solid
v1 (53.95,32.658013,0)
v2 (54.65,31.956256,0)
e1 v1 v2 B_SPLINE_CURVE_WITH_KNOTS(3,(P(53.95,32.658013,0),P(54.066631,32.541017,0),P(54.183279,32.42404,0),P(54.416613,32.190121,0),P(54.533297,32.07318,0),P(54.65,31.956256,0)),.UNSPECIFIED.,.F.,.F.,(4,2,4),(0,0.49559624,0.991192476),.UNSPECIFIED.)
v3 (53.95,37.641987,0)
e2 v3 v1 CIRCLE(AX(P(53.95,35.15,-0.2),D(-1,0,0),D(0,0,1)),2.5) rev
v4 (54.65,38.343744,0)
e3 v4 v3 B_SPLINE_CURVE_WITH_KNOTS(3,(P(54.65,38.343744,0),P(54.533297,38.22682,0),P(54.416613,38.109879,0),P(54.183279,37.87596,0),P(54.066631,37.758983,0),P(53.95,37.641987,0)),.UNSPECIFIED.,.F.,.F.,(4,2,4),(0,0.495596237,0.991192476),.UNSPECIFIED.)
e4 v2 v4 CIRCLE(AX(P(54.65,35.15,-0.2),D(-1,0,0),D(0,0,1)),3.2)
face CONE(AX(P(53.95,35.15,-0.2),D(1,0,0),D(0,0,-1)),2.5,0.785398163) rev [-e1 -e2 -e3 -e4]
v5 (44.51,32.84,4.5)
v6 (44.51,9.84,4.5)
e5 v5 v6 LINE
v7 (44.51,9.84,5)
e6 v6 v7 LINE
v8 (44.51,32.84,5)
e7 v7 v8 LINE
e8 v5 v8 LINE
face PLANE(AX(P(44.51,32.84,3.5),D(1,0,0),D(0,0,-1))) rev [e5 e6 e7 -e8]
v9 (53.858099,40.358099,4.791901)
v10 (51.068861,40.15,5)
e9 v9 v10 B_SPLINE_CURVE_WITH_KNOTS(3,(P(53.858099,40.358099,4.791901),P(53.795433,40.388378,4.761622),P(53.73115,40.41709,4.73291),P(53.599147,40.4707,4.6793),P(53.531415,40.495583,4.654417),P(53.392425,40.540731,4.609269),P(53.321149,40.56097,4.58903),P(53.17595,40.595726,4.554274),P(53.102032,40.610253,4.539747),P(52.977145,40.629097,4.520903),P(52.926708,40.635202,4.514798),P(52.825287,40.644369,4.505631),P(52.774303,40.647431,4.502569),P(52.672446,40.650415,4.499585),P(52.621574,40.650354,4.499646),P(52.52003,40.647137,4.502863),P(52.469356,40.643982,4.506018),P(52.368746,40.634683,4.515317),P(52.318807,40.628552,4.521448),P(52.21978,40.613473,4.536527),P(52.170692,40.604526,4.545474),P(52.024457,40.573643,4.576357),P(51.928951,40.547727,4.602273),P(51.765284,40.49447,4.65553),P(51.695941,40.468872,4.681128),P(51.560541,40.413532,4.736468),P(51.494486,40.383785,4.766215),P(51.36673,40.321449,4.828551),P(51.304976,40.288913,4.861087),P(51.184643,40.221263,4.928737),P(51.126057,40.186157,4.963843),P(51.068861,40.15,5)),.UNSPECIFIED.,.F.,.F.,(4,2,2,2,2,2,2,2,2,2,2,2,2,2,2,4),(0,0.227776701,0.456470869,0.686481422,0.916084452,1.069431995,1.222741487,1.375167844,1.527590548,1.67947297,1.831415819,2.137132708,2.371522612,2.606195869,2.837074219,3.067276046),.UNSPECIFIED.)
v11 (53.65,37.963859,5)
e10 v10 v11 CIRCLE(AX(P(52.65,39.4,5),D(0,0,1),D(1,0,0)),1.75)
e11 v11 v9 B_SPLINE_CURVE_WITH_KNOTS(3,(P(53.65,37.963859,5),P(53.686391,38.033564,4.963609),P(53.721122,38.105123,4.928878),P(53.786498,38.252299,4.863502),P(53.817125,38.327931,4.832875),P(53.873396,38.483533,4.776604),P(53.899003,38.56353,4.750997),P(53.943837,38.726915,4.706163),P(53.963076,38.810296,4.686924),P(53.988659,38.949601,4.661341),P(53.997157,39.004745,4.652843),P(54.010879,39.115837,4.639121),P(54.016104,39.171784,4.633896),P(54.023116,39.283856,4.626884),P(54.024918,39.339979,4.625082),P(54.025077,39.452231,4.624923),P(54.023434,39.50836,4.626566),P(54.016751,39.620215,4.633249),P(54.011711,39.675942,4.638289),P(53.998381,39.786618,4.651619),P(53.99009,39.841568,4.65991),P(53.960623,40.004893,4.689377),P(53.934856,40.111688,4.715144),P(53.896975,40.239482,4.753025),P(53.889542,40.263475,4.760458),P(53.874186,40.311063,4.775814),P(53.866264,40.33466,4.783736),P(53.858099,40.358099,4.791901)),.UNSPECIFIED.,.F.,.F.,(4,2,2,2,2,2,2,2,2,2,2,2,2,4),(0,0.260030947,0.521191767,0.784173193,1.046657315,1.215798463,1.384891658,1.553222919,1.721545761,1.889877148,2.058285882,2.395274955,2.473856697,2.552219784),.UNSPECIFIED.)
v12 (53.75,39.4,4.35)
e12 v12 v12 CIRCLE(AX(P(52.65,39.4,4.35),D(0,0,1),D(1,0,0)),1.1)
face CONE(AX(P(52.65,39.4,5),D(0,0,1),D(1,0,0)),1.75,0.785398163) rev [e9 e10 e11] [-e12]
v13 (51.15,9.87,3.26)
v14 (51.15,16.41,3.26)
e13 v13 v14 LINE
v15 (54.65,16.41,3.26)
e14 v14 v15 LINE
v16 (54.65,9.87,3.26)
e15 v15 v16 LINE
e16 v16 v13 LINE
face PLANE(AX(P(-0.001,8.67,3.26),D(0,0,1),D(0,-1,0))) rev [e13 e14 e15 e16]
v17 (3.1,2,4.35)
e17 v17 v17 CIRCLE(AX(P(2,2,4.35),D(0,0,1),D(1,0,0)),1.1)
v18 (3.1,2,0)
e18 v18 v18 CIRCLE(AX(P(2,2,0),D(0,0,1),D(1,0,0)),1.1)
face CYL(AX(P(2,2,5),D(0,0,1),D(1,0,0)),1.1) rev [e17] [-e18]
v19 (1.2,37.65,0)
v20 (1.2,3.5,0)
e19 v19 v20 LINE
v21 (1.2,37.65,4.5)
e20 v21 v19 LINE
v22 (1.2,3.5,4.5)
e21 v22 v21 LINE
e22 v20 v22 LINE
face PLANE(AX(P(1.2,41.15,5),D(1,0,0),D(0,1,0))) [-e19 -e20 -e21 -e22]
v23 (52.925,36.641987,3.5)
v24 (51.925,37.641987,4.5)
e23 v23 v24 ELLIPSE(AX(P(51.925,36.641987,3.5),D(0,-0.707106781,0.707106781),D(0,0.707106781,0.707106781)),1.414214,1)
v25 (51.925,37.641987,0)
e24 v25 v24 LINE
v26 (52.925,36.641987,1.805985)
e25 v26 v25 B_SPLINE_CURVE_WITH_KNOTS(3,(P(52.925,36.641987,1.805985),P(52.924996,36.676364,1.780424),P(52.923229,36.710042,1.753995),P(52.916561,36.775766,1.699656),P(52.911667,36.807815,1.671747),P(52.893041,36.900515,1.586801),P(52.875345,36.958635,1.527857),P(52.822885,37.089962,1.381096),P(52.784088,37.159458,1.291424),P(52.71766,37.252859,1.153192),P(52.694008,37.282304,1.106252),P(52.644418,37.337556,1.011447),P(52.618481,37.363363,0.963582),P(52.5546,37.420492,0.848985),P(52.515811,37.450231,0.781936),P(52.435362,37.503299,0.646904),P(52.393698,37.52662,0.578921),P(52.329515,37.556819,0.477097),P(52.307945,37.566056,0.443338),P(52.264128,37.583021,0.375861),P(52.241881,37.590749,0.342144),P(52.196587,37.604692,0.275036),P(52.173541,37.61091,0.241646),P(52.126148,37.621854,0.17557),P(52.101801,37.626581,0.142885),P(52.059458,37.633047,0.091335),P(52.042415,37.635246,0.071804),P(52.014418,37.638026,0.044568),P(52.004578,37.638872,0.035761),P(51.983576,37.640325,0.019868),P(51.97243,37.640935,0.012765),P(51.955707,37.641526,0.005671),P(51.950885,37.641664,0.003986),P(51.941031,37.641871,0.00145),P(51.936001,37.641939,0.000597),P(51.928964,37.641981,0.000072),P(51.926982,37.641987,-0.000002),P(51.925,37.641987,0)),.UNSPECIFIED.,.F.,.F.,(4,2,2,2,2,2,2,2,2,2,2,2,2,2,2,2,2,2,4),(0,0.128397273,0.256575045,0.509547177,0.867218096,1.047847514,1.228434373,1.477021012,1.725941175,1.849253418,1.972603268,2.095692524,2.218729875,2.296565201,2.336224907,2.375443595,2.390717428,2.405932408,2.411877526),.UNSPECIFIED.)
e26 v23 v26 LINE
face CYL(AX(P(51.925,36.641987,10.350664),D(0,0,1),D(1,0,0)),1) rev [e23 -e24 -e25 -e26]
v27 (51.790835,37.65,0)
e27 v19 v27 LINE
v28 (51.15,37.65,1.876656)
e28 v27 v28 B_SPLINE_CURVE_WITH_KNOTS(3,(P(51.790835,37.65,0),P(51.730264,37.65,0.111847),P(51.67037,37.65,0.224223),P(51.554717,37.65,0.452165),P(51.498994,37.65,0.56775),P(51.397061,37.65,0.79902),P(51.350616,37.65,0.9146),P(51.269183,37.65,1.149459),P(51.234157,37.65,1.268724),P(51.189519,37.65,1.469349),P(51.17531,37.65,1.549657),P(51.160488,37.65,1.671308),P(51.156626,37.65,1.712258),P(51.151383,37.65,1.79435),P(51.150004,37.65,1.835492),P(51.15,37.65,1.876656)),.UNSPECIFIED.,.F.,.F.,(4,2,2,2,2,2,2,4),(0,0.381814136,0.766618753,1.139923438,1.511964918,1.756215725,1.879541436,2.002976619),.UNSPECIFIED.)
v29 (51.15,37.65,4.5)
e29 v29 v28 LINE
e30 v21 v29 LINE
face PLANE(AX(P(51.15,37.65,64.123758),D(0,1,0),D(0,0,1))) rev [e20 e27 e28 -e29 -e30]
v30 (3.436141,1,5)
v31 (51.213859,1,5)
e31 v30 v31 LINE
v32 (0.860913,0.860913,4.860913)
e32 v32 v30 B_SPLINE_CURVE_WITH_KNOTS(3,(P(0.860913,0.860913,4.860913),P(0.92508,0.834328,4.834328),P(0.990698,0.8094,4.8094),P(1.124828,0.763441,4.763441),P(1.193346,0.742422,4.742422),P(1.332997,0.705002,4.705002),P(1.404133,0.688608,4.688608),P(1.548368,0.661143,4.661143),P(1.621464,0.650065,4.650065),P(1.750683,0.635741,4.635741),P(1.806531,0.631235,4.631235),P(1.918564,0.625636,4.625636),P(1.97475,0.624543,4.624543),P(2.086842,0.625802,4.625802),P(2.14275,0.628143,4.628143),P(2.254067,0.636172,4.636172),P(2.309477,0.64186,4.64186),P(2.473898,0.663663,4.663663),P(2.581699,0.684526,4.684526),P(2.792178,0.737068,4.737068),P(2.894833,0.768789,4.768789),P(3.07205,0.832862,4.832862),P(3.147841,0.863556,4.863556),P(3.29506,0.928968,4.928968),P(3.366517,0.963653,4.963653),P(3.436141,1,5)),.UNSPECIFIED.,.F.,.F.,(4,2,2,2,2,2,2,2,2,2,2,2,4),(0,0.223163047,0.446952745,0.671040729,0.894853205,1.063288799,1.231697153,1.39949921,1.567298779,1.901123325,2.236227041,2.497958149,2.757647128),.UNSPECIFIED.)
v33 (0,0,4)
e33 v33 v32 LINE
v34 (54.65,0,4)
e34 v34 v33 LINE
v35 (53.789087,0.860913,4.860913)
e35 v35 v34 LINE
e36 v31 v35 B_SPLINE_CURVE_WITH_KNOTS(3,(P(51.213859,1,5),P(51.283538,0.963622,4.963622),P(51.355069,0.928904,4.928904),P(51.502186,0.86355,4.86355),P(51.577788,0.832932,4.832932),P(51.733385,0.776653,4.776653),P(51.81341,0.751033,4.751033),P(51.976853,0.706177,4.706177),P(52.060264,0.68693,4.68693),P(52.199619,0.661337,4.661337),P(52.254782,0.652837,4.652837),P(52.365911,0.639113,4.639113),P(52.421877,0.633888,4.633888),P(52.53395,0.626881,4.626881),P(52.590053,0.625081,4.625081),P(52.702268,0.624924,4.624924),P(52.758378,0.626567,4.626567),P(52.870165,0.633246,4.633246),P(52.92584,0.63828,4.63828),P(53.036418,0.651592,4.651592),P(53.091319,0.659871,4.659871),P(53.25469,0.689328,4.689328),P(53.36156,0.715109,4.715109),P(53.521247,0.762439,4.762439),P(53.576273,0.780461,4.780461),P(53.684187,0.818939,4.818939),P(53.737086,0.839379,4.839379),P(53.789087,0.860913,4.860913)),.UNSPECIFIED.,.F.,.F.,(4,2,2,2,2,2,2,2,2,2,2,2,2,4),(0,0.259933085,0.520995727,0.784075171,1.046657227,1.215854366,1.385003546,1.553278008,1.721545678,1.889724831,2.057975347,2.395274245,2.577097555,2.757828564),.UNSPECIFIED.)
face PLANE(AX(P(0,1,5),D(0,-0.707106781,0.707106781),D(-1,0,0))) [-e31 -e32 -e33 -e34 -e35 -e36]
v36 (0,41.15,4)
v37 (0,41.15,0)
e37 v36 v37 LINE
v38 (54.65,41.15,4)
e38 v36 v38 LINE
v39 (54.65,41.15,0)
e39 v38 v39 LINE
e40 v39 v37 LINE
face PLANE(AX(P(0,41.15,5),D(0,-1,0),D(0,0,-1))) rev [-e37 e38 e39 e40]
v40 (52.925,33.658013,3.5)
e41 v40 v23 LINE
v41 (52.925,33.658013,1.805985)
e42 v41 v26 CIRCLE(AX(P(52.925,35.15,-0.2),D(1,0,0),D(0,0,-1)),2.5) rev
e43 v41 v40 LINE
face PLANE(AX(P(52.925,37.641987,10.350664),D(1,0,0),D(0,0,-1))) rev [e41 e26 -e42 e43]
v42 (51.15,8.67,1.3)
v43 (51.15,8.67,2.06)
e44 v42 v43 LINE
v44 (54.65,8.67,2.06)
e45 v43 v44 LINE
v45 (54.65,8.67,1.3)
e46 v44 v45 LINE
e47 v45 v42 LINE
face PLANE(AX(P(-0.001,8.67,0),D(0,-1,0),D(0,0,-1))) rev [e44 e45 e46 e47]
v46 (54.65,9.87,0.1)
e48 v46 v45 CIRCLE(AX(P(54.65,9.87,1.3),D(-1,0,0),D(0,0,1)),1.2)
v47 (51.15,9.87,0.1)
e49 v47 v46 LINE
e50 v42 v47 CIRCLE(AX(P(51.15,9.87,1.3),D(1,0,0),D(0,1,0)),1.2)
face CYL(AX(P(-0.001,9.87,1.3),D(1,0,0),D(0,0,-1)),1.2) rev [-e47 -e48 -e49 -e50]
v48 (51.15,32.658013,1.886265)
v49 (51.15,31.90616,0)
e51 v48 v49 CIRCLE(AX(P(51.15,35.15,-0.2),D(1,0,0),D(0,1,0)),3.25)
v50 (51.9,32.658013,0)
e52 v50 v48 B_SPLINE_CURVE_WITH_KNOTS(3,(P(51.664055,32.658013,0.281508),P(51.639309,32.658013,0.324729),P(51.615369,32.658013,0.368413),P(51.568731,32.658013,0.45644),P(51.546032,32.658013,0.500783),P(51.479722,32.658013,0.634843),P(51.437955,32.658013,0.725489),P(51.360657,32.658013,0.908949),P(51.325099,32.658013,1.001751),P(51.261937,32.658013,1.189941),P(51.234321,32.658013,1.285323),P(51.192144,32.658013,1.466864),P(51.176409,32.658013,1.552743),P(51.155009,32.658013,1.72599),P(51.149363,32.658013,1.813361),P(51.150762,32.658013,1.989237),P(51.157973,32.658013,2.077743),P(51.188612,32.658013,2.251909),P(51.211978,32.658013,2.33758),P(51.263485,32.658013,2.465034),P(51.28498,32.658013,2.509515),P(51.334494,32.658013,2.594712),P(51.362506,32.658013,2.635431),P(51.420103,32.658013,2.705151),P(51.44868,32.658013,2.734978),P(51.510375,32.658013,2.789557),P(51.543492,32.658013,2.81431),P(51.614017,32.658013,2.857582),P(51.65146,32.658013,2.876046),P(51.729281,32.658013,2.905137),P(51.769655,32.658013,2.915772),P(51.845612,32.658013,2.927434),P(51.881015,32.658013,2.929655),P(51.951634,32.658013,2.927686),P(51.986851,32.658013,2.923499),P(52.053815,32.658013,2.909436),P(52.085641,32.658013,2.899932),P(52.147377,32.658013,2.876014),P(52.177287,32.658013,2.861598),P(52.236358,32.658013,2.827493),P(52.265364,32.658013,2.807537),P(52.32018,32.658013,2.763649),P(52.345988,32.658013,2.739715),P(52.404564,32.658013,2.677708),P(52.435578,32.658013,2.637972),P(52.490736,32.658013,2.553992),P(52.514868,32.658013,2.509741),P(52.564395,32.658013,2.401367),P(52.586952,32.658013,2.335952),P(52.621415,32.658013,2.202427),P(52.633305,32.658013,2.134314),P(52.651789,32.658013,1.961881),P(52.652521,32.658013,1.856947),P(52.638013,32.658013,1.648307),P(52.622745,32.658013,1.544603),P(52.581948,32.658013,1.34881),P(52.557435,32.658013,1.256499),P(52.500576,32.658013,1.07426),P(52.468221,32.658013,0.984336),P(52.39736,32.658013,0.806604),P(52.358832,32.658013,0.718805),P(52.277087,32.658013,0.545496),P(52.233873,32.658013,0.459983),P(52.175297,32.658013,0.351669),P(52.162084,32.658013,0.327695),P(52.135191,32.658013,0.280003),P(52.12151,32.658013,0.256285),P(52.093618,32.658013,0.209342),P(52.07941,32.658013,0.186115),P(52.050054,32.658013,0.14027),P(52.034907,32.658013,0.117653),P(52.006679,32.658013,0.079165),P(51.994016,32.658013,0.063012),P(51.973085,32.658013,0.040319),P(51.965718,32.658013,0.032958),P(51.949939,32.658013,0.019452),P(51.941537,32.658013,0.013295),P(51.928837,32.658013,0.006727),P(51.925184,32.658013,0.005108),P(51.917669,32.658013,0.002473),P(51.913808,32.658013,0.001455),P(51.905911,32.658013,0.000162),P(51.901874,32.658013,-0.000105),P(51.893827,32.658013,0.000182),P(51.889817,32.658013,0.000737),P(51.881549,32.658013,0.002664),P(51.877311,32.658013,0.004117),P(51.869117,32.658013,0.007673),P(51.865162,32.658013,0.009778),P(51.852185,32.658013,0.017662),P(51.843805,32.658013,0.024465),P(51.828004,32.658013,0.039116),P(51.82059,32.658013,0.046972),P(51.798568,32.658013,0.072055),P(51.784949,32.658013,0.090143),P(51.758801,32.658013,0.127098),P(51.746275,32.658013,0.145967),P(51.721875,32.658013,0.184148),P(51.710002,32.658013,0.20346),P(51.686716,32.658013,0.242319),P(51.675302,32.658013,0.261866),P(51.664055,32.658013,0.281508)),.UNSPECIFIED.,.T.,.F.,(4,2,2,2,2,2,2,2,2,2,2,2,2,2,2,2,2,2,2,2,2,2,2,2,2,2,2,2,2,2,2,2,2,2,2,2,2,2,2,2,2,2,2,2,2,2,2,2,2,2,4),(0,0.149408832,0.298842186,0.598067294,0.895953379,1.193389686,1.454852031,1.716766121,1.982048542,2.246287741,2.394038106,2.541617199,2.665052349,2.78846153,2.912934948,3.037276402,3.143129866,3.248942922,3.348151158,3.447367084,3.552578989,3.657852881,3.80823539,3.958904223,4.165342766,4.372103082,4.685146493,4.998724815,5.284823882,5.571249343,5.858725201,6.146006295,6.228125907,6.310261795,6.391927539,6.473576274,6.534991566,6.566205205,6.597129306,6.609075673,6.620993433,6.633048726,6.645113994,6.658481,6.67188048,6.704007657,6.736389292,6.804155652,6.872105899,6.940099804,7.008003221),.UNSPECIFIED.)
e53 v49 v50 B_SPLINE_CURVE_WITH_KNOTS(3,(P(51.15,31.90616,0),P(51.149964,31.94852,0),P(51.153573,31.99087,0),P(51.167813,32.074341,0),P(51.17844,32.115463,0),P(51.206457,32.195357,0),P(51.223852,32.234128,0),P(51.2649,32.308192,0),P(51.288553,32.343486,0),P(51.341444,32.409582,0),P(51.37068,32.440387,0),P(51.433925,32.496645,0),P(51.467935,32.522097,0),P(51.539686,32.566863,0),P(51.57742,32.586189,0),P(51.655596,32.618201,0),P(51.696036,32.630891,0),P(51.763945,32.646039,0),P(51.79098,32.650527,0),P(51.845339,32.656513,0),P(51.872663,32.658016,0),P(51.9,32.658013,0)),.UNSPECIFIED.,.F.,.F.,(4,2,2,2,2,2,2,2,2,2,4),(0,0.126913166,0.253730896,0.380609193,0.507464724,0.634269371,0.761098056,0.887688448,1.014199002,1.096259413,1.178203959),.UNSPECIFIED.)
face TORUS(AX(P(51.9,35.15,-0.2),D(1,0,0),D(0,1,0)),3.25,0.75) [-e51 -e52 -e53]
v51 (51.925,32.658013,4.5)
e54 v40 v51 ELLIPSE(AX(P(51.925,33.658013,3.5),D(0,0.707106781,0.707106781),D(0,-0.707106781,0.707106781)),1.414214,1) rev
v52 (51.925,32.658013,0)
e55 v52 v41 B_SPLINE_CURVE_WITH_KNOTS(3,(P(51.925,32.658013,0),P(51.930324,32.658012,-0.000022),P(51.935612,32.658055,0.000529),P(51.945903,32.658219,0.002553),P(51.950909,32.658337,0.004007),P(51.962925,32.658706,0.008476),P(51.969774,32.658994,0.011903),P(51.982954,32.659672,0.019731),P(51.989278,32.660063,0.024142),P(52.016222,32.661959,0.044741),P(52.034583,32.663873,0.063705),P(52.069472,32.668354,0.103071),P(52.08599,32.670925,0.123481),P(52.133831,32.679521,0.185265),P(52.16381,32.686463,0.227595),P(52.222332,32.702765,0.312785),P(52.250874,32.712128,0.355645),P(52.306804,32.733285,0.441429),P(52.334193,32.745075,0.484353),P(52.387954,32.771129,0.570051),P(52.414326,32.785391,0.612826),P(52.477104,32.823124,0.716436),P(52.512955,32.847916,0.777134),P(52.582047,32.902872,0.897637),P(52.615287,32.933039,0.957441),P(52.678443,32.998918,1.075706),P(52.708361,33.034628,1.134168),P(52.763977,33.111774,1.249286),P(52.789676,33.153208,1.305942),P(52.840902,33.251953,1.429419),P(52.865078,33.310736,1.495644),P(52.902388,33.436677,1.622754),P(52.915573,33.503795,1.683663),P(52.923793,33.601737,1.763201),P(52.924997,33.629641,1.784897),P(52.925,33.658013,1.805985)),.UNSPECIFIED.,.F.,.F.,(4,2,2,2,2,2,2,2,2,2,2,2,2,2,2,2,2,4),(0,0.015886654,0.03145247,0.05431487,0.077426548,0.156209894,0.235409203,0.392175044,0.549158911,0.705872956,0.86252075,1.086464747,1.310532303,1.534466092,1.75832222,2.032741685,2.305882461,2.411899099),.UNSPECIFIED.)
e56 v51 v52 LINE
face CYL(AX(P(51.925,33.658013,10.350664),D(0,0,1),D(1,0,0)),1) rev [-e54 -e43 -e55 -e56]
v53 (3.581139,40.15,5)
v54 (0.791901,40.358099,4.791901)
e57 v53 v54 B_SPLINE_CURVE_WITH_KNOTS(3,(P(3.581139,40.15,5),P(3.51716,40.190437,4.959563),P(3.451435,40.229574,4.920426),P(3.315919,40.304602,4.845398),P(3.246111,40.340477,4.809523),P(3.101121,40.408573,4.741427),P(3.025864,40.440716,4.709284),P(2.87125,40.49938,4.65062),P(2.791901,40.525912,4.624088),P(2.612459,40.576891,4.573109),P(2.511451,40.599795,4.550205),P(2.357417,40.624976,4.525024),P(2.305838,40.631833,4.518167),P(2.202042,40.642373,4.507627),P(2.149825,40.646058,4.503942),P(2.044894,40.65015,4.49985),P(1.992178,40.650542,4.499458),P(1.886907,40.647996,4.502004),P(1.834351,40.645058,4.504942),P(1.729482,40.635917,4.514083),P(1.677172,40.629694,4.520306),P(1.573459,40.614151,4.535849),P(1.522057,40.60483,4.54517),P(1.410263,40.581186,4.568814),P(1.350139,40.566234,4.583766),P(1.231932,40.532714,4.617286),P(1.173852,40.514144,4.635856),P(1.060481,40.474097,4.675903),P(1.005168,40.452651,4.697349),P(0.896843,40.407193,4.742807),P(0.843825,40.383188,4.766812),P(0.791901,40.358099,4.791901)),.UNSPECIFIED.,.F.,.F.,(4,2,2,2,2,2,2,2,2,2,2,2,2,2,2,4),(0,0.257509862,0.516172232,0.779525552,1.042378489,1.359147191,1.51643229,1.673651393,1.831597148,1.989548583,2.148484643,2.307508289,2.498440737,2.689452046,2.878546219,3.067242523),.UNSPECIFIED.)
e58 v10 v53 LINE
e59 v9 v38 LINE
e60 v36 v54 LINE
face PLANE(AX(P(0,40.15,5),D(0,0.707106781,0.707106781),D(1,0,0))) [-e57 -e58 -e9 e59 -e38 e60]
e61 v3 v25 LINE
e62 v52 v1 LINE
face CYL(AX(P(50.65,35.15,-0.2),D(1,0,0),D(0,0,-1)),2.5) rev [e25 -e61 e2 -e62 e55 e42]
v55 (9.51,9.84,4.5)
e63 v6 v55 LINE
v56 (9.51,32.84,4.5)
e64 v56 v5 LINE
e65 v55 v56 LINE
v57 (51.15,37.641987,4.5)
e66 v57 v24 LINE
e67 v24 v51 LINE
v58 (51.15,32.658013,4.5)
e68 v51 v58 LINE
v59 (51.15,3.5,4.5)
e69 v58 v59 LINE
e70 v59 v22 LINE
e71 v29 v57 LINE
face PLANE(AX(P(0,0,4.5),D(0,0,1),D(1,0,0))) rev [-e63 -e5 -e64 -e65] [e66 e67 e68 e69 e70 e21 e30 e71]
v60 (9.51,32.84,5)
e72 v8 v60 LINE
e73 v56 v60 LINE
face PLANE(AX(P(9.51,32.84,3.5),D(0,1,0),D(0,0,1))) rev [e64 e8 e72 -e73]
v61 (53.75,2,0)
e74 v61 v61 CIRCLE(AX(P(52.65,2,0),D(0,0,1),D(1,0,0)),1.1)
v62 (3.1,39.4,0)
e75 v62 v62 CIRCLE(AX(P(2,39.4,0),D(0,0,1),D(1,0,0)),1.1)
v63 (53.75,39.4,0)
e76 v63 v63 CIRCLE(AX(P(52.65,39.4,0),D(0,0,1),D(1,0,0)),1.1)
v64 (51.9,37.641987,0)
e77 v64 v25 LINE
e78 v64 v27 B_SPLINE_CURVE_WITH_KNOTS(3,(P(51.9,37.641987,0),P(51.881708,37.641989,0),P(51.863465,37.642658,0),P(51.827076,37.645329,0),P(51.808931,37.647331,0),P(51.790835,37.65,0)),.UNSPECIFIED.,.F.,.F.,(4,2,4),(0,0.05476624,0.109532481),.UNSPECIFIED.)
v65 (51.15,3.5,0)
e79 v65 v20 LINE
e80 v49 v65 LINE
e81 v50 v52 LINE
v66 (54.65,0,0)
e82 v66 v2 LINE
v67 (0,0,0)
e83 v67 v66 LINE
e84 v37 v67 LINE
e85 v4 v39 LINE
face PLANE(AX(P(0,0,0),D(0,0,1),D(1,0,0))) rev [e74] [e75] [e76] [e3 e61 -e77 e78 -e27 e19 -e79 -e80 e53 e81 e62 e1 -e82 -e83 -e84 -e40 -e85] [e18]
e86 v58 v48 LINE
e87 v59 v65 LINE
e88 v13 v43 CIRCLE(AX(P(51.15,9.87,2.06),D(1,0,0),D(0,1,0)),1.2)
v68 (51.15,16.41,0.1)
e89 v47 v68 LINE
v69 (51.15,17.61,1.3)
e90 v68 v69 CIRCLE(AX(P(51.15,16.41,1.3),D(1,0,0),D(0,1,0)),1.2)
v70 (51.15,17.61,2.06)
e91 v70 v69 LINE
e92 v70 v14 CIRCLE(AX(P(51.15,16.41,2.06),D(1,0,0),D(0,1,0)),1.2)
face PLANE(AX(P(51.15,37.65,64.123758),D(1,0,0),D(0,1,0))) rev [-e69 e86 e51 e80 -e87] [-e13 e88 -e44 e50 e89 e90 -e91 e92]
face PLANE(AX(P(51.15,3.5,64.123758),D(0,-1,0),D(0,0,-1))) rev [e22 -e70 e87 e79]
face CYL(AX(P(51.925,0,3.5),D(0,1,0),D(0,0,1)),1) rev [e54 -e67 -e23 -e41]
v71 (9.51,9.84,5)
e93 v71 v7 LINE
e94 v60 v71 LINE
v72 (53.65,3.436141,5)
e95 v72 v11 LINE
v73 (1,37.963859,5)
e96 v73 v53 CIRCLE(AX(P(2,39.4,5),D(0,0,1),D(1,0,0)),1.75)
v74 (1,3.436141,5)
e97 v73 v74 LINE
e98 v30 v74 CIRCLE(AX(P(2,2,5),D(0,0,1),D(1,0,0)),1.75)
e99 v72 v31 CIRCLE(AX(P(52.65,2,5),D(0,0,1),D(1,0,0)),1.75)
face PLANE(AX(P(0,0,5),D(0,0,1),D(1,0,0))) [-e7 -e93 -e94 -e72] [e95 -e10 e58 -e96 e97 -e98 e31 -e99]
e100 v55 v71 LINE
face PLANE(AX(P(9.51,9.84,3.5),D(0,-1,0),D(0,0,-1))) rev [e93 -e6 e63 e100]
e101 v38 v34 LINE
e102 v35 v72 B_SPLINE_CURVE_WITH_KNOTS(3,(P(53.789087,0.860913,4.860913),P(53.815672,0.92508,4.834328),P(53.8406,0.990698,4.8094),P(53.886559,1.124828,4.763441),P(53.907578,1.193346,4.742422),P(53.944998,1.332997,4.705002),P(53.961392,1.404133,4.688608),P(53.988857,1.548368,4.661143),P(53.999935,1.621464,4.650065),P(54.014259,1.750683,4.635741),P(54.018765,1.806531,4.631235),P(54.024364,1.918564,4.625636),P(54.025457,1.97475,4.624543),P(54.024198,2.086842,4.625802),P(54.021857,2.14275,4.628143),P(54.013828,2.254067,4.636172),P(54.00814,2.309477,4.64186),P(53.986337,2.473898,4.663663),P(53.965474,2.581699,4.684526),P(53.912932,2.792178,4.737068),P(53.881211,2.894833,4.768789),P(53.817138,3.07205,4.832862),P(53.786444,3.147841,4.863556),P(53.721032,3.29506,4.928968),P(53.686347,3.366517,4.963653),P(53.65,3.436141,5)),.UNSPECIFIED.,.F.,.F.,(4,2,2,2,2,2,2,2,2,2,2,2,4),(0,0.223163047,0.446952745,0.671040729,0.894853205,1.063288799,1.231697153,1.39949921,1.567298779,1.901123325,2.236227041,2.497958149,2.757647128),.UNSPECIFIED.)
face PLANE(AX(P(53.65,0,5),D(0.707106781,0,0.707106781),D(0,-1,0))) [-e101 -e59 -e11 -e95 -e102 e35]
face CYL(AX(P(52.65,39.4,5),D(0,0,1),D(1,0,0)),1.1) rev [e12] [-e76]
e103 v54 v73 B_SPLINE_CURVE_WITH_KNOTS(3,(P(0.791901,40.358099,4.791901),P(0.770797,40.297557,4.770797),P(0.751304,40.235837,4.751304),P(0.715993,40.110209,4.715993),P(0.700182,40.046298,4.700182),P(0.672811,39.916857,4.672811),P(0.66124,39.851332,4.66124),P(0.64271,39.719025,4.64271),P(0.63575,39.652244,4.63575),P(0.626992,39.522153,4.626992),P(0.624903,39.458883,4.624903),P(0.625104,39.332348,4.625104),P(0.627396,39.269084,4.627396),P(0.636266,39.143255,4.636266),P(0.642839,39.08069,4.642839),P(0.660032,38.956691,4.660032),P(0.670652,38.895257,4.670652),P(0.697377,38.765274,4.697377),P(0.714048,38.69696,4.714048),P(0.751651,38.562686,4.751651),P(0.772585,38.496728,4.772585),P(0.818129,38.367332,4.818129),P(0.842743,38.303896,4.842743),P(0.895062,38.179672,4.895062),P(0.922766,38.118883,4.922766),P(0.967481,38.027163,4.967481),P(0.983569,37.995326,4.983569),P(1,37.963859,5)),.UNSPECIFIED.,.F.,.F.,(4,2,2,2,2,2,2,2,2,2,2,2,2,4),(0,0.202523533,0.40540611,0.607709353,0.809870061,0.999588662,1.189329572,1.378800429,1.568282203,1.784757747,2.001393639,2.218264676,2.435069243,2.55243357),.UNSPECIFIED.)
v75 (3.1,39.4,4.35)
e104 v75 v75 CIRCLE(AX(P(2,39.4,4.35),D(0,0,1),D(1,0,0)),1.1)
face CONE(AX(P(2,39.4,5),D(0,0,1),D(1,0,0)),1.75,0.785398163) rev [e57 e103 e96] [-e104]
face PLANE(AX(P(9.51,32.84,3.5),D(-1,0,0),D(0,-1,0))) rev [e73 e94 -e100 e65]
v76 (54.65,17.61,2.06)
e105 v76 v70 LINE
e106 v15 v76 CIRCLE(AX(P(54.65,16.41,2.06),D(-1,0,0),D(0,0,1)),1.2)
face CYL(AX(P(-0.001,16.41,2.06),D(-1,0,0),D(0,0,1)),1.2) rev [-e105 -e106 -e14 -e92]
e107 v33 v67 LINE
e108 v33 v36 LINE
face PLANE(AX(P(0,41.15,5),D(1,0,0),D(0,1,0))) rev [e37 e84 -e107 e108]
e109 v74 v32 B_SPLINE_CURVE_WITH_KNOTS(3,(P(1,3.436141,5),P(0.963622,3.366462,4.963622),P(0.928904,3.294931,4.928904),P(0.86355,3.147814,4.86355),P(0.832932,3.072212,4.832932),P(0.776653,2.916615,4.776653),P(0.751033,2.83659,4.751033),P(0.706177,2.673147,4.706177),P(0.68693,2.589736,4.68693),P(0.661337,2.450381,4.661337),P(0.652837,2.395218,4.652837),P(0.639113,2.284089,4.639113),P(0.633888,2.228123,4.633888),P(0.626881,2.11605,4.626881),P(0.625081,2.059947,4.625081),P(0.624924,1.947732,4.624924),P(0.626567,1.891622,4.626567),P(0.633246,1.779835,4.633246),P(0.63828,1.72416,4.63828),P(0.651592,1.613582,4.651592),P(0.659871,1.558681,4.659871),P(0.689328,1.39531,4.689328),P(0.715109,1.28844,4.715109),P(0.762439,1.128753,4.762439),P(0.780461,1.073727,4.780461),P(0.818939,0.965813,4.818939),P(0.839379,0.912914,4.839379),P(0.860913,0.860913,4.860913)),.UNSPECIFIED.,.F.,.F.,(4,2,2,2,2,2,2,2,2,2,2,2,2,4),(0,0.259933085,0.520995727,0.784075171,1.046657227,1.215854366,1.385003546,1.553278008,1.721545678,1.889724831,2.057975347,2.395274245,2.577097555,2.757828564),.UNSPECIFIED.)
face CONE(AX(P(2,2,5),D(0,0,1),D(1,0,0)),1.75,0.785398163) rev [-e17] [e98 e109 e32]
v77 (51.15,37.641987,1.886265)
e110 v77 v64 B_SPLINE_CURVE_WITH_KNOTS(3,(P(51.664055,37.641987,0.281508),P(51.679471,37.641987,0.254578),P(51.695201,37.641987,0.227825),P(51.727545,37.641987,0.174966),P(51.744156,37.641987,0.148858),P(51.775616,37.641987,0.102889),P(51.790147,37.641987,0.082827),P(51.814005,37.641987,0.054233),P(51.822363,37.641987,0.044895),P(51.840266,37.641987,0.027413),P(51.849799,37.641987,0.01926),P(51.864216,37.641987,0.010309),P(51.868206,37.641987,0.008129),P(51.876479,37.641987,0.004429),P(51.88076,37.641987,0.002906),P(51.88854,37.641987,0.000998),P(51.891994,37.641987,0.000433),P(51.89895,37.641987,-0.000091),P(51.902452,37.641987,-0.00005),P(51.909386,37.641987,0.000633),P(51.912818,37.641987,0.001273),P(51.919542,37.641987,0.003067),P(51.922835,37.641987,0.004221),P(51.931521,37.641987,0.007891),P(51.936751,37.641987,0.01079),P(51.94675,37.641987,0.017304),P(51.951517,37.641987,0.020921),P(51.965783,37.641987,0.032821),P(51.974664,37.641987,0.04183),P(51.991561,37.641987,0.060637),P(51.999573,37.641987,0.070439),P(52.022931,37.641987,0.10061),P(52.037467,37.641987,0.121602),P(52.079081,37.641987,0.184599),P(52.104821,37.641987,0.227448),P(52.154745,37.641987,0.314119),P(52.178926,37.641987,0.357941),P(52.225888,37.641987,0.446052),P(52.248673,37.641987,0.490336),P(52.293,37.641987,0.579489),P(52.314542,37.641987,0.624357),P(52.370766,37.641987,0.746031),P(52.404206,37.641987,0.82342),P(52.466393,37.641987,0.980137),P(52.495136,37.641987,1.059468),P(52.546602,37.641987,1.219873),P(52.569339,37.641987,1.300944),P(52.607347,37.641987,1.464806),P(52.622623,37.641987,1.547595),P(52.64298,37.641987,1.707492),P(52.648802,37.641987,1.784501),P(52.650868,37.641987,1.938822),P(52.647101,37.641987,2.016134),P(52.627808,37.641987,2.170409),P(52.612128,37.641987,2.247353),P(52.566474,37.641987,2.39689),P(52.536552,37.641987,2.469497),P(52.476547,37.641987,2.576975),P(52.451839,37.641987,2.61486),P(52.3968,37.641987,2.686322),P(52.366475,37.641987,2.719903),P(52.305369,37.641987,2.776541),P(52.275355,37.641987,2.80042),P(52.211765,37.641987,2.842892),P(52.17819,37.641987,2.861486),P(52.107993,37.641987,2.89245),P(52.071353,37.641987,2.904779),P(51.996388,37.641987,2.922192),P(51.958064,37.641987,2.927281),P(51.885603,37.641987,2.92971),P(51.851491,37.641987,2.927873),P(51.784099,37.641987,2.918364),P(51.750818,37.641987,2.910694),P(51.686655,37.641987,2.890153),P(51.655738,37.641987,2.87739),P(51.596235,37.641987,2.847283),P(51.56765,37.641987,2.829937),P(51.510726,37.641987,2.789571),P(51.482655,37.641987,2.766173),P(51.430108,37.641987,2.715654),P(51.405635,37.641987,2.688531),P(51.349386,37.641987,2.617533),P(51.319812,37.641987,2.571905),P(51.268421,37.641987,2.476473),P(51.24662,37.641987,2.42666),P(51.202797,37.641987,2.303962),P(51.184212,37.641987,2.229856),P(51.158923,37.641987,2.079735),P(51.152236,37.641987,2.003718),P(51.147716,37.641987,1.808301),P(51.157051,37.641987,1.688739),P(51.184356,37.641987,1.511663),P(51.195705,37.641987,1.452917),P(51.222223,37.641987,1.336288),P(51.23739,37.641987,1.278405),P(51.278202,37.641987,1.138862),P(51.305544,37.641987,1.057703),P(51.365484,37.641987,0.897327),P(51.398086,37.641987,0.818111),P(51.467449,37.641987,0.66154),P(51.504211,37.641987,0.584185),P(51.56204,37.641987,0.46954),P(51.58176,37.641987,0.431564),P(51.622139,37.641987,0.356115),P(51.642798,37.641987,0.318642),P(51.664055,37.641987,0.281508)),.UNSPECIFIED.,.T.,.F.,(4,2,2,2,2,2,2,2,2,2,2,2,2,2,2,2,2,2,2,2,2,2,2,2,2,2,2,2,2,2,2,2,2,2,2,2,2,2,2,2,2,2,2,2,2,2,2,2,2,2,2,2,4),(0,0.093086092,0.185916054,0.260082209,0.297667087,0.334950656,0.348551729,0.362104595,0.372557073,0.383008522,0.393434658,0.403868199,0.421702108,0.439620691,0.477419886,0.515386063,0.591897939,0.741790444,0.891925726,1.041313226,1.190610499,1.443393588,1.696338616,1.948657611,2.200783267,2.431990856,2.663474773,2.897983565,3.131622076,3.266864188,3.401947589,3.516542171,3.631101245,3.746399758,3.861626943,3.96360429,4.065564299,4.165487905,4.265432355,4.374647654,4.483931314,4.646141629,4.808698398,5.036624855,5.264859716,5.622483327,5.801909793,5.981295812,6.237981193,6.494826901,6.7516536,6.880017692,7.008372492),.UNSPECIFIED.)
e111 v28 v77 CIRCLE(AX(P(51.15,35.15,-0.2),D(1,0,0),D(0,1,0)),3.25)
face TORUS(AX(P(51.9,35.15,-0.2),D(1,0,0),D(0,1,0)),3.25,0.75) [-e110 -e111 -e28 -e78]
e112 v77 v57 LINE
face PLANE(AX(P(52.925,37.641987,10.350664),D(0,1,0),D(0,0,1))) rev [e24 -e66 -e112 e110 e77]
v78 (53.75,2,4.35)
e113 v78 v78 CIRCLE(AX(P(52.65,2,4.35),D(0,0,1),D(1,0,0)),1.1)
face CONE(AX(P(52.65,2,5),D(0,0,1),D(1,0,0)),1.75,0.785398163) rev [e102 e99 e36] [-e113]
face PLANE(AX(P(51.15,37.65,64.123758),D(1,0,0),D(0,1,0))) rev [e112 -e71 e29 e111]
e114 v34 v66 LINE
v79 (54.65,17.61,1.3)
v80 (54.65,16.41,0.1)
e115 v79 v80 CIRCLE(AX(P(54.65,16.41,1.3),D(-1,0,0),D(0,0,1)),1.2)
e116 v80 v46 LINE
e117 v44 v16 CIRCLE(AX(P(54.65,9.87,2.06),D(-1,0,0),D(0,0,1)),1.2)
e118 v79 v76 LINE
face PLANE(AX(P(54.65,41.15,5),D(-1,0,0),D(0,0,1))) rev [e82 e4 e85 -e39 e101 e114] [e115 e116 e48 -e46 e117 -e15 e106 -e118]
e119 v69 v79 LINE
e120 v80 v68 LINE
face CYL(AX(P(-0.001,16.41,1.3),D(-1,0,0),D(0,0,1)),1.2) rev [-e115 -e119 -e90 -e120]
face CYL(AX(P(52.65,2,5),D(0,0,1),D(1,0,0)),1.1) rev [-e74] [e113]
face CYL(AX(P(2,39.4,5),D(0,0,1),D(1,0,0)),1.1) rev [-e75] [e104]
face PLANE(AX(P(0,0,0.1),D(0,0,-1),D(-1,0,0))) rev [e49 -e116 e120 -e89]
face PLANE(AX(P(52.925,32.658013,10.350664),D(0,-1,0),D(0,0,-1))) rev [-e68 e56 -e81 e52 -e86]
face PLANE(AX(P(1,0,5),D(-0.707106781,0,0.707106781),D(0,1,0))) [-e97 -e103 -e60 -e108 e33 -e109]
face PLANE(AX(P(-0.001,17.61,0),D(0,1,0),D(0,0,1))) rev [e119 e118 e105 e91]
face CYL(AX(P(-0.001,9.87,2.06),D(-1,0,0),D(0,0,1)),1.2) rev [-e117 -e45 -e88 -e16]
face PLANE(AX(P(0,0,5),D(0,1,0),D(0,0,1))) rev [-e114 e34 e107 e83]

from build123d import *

# Parameters (mm, degrees)
SKETCH1_W                                       = 54.65
SKETCH1_H                                       = 41.15
BOSS_EXTRUDE1_DEPTH                             = 5
SKETCH2_W                                       = 35
SKETCH2_H                                       = 23
CUT_EXTRUDE1_DEPTH                              = 1.5
SKETCH3_W                                       = 47.65
SKETCH3_H                                       = 34.15
CUT_EXTRUDE2_DEPTH                              = 4.5
SKETCH4_R                                       = 2.5
CUT_EXTRUDE3_DEPTH                              = 4
CHAMFER1_SIZE                                   = 0.7
CSK_FOR_M3_FLAT_HEAD_MACHINE_SCREW1_D           = 2.2
CSK_FOR_M3_FLAT_HEAD_MACHINE_SCREW1_DEPTH       = 6
CSK_FOR_M3_FLAT_HEAD_MACHINE_SCREW1_CSINK_D     = 3.5
CSK_FOR_M3_FLAT_HEAD_MACHINE_SCREW1_CSINK_ANGLE = 90
CSK_FOR_M3_FLAT_HEAD_MACHINE_SCREW1_TIP         = 0.660946681
CHAMFER2_SIZE                                   = 1
FILLET3_R                                       = 0.75
CUT_EXTRUDE4_REACH                              = 70.593
SKETCH7_W                                       = 3.26
SKETCH7_H                                       = 8.94
FILLET4_R                                       = 1.2
BOSS_EXTRUDE2_DEPTH                             = 10
BOSS_EXTRUDE2_DEPTH_BACK                        = 0.1
SKETCH8_W                                       = 3.5
SKETCH8_H                                       = 8.94
FILLET5_R                                       = 1.2
CUT_EXTRUDE5_DEPTH                              = 65.35505355
CUT_EXTRUDE5_DEPTH_BACK                         = 65.35505355
SKETCH9_W                                       = 3.5
SKETCH9_H                                       = 10
SKETCH10_W                                      = 4.5
SKETCH10_H                                      = 34.15
CUT_EXTRUDE6_DEPTH                              = 2.3
CUT_EXTRUDE7_START                              = -4.5
SKETCH11_W                                      = 3.064355189
SKETCH11_H                                      = 4.983974318
CUT_EXTRUDE7_DEPTH                              = 4.5
FILLET6_R                                       = 1


with BuildPart() as part:
    # Sketch1 → Boss-Extrude1 (new body)
    with BuildSketch(Plane.XY):
        with Locations((27.325, 20.575)):
            Rectangle(SKETCH1_W, SKETCH1_H)
    extrude(amount=BOSS_EXTRUDE1_DEPTH)

    # Sketch2 → Cut-Extrude1 (cut)
    with BuildSketch(Plane.XY.offset(5)):
        with Locations((27.01, 21.34)):
            Rectangle(SKETCH2_W, SKETCH2_H)
    extrude(amount=-CUT_EXTRUDE1_DEPTH, mode=Mode.SUBTRACT)

    # Sketch3 → Cut-Extrude2 (cut)
    with BuildSketch(Plane(origin=(0, 0, 0), x_dir=(-1, 0, 0), z_dir=(0, 0, -1))):
        with Locations((-27.325, 20.575)):
            Rectangle(SKETCH3_W, SKETCH3_H)
    extrude(amount=-CUT_EXTRUDE2_DEPTH, mode=Mode.SUBTRACT)

    # Sketch4 → Cut-Extrude3 (cut)
    with BuildSketch(Plane(origin=(54.65, 0, 0), x_dir=(0, 0, -1), z_dir=(1, 0, 0))):
        with Locations((0.2, 35.15)):
            Circle(SKETCH4_R)
    extrude(amount=-CUT_EXTRUDE3_DEPTH, mode=Mode.SUBTRACT)

    # Chamfer1
    chamfer1_edges = [part.edges().sort_by_distance(p)[0] for p in [
        (54.65, 35.15, 2.3),
    ]]
    chamfer(chamfer1_edges, length=CHAMFER1_SIZE)

    # CSK for M3 Flat Head Machine Screw1
    with Locations(Plane.XY.offset(5)):
        with Locations((52.65, 2), (2, 39.4), (52.65, 39.4), (2, 2)):
            CounterSinkHole(CSK_FOR_M3_FLAT_HEAD_MACHINE_SCREW1_D / 2, CSK_FOR_M3_FLAT_HEAD_MACHINE_SCREW1_CSINK_D / 2, depth=CSK_FOR_M3_FLAT_HEAD_MACHINE_SCREW1_DEPTH, counter_sink_angle=CSK_FOR_M3_FLAT_HEAD_MACHINE_SCREW1_CSINK_ANGLE)
            with Locations((0, 0, -(CSK_FOR_M3_FLAT_HEAD_MACHINE_SCREW1_DEPTH + CSK_FOR_M3_FLAT_HEAD_MACHINE_SCREW1_TIP / 2))):  # 118° drill point
                Cone(0, CSK_FOR_M3_FLAT_HEAD_MACHINE_SCREW1_D / 2, CSK_FOR_M3_FLAT_HEAD_MACHINE_SCREW1_TIP, mode=Mode.SUBTRACT)

    # Chamfer2
    # the kernel refuses this chamfer: 1 mm, written as the material it takes off along each edge
    with BuildSketch(Plane(origin=(-0.571682988, 41.15, 5), x_dir=(0, -0.9996219169112968, 0.027495876610586414), z_dir=(1, 0, 0))) as chamfer2_piece_1:
        Polygon((CHAMFER2_SIZE * 0.999621916911, CHAMFER2_SIZE * 0.0274958766106), (-CHAMFER2_SIZE * 0.0274958766106, CHAMFER2_SIZE * 0.999621916911), (0, 0), align=None)
    extrude(amount=55.793365976, mode=Mode.SUBTRACT)
    with BuildSketch(Plane(origin=(54.65, 43.721682988, 5), x_dir=(0.02749587661058907, 0, -0.9996219169112965), z_dir=(0, -1, 0)), Plane(origin=(0, -2.571682988, 5), x_dir=(-0.027495876610586365, 0, -0.9996219169112968), z_dir=(0, 1, 0))) as chamfer2_piece_2:
        Polygon((CHAMFER2_SIZE * 0.999621916911, -CHAMFER2_SIZE * 0.0274958766106), (-CHAMFER2_SIZE * 0.0274958766106, -CHAMFER2_SIZE * 0.999621916911), (0, 0), align=None)
    extrude(amount=46.293365976, mode=Mode.SUBTRACT)
    with BuildSketch(Plane(origin=(57.221682988, 0, 5), x_dir=(0, -0.027495876610586365, -0.9996219169112968), z_dir=(-1, 0, 0))) as chamfer2_piece_3:
        Polygon((CHAMFER2_SIZE * 0.999621916911, -CHAMFER2_SIZE * 0.0274958766106), (-CHAMFER2_SIZE * 0.0274958766106, -CHAMFER2_SIZE * 0.999621916911), (0, 0), align=None)
    extrude(amount=59.793365976, mode=Mode.SUBTRACT)

    # Fillet3
    fillet3_edges = [part.edges().sort_by_distance(p)[0] for p in [
        (51.15, 35.15, 2.3),
    ]]
    fillet(fillet3_edges, radius=FILLET3_R)

    # Sketch7 → Cut-Extrude4 (cut, up to next)
    with BuildSketch(Plane(origin=(54.65, 0, 0), x_dir=(0, 0, -1), z_dir=(1, 0, 0)), mode=Mode.PRIVATE) as cut_extrude4_sk1:
        with Locations((-1.63, 13.14)):
            Rectangle(SKETCH7_W, SKETCH7_H)
    cut_extrude4_tool1 = extrude(cut_extrude4_sk1.sketch, amount=-CUT_EXTRUDE4_REACH, mode=Mode.PRIVATE) & part.part
    add(cut_extrude4_tool1.solids().sort_by_distance((54.65, 13.14, 1.63))[0], mode=Mode.SUBTRACT)

    # Fillet4
    fillet4_edges = [part.edges().sort_by_distance(p)[0] for p in [
        (52.9, 8.67, 3.26),
        (52.9, 17.61, 3.26),
    ]]
    fillet(fillet4_edges, radius=FILLET4_R)

    # Sketch8 → Boss-Extrude2 (add, two sides: drawn at the far end of the back side and taken through both)
    with BuildSketch(Plane(origin=(0, 0, 0), x_dir=(-1, 0, 0), z_dir=(0, 0, -1)).offset(-BOSS_EXTRUDE2_DEPTH_BACK)):
        with Locations((-52.9, 13.14)):
            Rectangle(SKETCH8_W, SKETCH8_H)
    extrude(amount=BOSS_EXTRUDE2_DEPTH + BOSS_EXTRUDE2_DEPTH_BACK)

    # Fillet5
    fillet5_edges = [part.edges().sort_by_distance(p)[0] for p in [
        (52.9, 17.61, 0.1),
        (52.9, 8.67, 0.1),
    ]]
    fillet(fillet5_edges, radius=FILLET5_R)

    # Sketch9 → Cut-Extrude5 (cut, two sides: drawn at the far end of the back side and taken through both)
    with BuildSketch(Plane.XZ.offset(-8.67).offset(-CUT_EXTRUDE5_DEPTH_BACK)):
        with Locations((52.9, -5)):
            Rectangle(SKETCH9_W, SKETCH9_H)
    extrude(amount=CUT_EXTRUDE5_DEPTH + CUT_EXTRUDE5_DEPTH_BACK, mode=Mode.SUBTRACT)

    # Sketch10 → Cut-Extrude6 (cut)
    with BuildSketch(Plane(origin=(3.5, 0, 0), x_dir=(0, 0, -1), z_dir=(1, 0, 0))):
        with Locations((-2.25, 20.575)):
            Rectangle(SKETCH10_W, SKETCH10_H)
    extrude(amount=-CUT_EXTRUDE6_DEPTH, mode=Mode.SUBTRACT)

    # Sketch11 → Cut-Extrude7 (cut)
    with BuildSketch(Plane(origin=(0, 0, 0), x_dir=(-1, 0, 0), z_dir=(0, 0, -1)).offset(CUT_EXTRUDE7_START)):
        with Locations((-51.392822405, 35.15)):
            Rectangle(SKETCH11_W, SKETCH11_H)
    extrude(amount=CUT_EXTRUDE7_DEPTH, mode=Mode.SUBTRACT)

    # Fillet6
    # the kernel refuses this fillet: 1 mm, written as the material it adds along each edge
    with BuildSketch(Plane(origin=(52.925, 32.658012841, 7), x_dir=(-1, 0, 0), z_dir=(0, 0, -1))) as fillet6_piece_1_section:
        with BuildLine():
            CenterArc((FILLET6_R, FILLET6_R), FILLET6_R, 180, 90)
            Line((0, FILLET6_R), (0, 0))
            Line((0, 0), (FILLET6_R, 0))
        make_face()
    fillet6_piece_1 = extrude(amount=7, mode=Mode.PRIVATE)
    fillet6_piece_1 = fillet6_piece_1 - Plane(origin=(52.688942882, 35.15, -0.2), x_dir=(0, 0, -1), z_dir=(1, 0, 0)) * Cylinder(2.5, 18, mode=Mode.PRIVATE)
    fillet6_piece_1 = split(fillet6_piece_1, bisect_by=Plane(origin=(52.688942882, 32.861757349, 5), z_dir=(0, 0, -1)), keep=Keep.TOP, mode=Mode.PRIVATE)
    add(fillet6_piece_1)
    with BuildSketch(Plane(origin=(52.925, 30.158012841, 4.5), x_dir=(-1, 0, 0), z_dir=(0, 1, 0))) as fillet6_piece_2:
        with BuildLine():
            CenterArc((FILLET6_R, -FILLET6_R), FILLET6_R, 90, 90)
            Line((0, -FILLET6_R), (0, 0))
            Line((0, 0), (FILLET6_R, 0))
        make_face()
    extrude(amount=7.483974318)
    with BuildSketch(Plane(origin=(52.925, 37.641987159, 7), x_dir=(0, -1, 0), z_dir=(0, 0, -1))) as fillet6_piece_3_section:
        with BuildLine():
            CenterArc((FILLET6_R, FILLET6_R), FILLET6_R, 180, 90)
            Line((0, FILLET6_R), (0, 0))
            Line((0, 0), (FILLET6_R, 0))
        make_face()
    fillet6_piece_3 = extrude(amount=7, mode=Mode.PRIVATE)
    fillet6_piece_3 = fillet6_piece_3 - Plane(origin=(52.688929228, 35.15, -0.2), x_dir=(0, 0, -1), z_dir=(1, 0, 0)) * Cylinder(2.5, 18, mode=Mode.PRIVATE)
    fillet6_piece_3 = split(fillet6_piece_3, bisect_by=Plane(origin=(52.688929228, 37.438232823, 5), z_dir=(0, 0, -1)), keep=Keep.TOP, mode=Mode.PRIVATE)
    add(fillet6_piece_3)


solid = part.part
